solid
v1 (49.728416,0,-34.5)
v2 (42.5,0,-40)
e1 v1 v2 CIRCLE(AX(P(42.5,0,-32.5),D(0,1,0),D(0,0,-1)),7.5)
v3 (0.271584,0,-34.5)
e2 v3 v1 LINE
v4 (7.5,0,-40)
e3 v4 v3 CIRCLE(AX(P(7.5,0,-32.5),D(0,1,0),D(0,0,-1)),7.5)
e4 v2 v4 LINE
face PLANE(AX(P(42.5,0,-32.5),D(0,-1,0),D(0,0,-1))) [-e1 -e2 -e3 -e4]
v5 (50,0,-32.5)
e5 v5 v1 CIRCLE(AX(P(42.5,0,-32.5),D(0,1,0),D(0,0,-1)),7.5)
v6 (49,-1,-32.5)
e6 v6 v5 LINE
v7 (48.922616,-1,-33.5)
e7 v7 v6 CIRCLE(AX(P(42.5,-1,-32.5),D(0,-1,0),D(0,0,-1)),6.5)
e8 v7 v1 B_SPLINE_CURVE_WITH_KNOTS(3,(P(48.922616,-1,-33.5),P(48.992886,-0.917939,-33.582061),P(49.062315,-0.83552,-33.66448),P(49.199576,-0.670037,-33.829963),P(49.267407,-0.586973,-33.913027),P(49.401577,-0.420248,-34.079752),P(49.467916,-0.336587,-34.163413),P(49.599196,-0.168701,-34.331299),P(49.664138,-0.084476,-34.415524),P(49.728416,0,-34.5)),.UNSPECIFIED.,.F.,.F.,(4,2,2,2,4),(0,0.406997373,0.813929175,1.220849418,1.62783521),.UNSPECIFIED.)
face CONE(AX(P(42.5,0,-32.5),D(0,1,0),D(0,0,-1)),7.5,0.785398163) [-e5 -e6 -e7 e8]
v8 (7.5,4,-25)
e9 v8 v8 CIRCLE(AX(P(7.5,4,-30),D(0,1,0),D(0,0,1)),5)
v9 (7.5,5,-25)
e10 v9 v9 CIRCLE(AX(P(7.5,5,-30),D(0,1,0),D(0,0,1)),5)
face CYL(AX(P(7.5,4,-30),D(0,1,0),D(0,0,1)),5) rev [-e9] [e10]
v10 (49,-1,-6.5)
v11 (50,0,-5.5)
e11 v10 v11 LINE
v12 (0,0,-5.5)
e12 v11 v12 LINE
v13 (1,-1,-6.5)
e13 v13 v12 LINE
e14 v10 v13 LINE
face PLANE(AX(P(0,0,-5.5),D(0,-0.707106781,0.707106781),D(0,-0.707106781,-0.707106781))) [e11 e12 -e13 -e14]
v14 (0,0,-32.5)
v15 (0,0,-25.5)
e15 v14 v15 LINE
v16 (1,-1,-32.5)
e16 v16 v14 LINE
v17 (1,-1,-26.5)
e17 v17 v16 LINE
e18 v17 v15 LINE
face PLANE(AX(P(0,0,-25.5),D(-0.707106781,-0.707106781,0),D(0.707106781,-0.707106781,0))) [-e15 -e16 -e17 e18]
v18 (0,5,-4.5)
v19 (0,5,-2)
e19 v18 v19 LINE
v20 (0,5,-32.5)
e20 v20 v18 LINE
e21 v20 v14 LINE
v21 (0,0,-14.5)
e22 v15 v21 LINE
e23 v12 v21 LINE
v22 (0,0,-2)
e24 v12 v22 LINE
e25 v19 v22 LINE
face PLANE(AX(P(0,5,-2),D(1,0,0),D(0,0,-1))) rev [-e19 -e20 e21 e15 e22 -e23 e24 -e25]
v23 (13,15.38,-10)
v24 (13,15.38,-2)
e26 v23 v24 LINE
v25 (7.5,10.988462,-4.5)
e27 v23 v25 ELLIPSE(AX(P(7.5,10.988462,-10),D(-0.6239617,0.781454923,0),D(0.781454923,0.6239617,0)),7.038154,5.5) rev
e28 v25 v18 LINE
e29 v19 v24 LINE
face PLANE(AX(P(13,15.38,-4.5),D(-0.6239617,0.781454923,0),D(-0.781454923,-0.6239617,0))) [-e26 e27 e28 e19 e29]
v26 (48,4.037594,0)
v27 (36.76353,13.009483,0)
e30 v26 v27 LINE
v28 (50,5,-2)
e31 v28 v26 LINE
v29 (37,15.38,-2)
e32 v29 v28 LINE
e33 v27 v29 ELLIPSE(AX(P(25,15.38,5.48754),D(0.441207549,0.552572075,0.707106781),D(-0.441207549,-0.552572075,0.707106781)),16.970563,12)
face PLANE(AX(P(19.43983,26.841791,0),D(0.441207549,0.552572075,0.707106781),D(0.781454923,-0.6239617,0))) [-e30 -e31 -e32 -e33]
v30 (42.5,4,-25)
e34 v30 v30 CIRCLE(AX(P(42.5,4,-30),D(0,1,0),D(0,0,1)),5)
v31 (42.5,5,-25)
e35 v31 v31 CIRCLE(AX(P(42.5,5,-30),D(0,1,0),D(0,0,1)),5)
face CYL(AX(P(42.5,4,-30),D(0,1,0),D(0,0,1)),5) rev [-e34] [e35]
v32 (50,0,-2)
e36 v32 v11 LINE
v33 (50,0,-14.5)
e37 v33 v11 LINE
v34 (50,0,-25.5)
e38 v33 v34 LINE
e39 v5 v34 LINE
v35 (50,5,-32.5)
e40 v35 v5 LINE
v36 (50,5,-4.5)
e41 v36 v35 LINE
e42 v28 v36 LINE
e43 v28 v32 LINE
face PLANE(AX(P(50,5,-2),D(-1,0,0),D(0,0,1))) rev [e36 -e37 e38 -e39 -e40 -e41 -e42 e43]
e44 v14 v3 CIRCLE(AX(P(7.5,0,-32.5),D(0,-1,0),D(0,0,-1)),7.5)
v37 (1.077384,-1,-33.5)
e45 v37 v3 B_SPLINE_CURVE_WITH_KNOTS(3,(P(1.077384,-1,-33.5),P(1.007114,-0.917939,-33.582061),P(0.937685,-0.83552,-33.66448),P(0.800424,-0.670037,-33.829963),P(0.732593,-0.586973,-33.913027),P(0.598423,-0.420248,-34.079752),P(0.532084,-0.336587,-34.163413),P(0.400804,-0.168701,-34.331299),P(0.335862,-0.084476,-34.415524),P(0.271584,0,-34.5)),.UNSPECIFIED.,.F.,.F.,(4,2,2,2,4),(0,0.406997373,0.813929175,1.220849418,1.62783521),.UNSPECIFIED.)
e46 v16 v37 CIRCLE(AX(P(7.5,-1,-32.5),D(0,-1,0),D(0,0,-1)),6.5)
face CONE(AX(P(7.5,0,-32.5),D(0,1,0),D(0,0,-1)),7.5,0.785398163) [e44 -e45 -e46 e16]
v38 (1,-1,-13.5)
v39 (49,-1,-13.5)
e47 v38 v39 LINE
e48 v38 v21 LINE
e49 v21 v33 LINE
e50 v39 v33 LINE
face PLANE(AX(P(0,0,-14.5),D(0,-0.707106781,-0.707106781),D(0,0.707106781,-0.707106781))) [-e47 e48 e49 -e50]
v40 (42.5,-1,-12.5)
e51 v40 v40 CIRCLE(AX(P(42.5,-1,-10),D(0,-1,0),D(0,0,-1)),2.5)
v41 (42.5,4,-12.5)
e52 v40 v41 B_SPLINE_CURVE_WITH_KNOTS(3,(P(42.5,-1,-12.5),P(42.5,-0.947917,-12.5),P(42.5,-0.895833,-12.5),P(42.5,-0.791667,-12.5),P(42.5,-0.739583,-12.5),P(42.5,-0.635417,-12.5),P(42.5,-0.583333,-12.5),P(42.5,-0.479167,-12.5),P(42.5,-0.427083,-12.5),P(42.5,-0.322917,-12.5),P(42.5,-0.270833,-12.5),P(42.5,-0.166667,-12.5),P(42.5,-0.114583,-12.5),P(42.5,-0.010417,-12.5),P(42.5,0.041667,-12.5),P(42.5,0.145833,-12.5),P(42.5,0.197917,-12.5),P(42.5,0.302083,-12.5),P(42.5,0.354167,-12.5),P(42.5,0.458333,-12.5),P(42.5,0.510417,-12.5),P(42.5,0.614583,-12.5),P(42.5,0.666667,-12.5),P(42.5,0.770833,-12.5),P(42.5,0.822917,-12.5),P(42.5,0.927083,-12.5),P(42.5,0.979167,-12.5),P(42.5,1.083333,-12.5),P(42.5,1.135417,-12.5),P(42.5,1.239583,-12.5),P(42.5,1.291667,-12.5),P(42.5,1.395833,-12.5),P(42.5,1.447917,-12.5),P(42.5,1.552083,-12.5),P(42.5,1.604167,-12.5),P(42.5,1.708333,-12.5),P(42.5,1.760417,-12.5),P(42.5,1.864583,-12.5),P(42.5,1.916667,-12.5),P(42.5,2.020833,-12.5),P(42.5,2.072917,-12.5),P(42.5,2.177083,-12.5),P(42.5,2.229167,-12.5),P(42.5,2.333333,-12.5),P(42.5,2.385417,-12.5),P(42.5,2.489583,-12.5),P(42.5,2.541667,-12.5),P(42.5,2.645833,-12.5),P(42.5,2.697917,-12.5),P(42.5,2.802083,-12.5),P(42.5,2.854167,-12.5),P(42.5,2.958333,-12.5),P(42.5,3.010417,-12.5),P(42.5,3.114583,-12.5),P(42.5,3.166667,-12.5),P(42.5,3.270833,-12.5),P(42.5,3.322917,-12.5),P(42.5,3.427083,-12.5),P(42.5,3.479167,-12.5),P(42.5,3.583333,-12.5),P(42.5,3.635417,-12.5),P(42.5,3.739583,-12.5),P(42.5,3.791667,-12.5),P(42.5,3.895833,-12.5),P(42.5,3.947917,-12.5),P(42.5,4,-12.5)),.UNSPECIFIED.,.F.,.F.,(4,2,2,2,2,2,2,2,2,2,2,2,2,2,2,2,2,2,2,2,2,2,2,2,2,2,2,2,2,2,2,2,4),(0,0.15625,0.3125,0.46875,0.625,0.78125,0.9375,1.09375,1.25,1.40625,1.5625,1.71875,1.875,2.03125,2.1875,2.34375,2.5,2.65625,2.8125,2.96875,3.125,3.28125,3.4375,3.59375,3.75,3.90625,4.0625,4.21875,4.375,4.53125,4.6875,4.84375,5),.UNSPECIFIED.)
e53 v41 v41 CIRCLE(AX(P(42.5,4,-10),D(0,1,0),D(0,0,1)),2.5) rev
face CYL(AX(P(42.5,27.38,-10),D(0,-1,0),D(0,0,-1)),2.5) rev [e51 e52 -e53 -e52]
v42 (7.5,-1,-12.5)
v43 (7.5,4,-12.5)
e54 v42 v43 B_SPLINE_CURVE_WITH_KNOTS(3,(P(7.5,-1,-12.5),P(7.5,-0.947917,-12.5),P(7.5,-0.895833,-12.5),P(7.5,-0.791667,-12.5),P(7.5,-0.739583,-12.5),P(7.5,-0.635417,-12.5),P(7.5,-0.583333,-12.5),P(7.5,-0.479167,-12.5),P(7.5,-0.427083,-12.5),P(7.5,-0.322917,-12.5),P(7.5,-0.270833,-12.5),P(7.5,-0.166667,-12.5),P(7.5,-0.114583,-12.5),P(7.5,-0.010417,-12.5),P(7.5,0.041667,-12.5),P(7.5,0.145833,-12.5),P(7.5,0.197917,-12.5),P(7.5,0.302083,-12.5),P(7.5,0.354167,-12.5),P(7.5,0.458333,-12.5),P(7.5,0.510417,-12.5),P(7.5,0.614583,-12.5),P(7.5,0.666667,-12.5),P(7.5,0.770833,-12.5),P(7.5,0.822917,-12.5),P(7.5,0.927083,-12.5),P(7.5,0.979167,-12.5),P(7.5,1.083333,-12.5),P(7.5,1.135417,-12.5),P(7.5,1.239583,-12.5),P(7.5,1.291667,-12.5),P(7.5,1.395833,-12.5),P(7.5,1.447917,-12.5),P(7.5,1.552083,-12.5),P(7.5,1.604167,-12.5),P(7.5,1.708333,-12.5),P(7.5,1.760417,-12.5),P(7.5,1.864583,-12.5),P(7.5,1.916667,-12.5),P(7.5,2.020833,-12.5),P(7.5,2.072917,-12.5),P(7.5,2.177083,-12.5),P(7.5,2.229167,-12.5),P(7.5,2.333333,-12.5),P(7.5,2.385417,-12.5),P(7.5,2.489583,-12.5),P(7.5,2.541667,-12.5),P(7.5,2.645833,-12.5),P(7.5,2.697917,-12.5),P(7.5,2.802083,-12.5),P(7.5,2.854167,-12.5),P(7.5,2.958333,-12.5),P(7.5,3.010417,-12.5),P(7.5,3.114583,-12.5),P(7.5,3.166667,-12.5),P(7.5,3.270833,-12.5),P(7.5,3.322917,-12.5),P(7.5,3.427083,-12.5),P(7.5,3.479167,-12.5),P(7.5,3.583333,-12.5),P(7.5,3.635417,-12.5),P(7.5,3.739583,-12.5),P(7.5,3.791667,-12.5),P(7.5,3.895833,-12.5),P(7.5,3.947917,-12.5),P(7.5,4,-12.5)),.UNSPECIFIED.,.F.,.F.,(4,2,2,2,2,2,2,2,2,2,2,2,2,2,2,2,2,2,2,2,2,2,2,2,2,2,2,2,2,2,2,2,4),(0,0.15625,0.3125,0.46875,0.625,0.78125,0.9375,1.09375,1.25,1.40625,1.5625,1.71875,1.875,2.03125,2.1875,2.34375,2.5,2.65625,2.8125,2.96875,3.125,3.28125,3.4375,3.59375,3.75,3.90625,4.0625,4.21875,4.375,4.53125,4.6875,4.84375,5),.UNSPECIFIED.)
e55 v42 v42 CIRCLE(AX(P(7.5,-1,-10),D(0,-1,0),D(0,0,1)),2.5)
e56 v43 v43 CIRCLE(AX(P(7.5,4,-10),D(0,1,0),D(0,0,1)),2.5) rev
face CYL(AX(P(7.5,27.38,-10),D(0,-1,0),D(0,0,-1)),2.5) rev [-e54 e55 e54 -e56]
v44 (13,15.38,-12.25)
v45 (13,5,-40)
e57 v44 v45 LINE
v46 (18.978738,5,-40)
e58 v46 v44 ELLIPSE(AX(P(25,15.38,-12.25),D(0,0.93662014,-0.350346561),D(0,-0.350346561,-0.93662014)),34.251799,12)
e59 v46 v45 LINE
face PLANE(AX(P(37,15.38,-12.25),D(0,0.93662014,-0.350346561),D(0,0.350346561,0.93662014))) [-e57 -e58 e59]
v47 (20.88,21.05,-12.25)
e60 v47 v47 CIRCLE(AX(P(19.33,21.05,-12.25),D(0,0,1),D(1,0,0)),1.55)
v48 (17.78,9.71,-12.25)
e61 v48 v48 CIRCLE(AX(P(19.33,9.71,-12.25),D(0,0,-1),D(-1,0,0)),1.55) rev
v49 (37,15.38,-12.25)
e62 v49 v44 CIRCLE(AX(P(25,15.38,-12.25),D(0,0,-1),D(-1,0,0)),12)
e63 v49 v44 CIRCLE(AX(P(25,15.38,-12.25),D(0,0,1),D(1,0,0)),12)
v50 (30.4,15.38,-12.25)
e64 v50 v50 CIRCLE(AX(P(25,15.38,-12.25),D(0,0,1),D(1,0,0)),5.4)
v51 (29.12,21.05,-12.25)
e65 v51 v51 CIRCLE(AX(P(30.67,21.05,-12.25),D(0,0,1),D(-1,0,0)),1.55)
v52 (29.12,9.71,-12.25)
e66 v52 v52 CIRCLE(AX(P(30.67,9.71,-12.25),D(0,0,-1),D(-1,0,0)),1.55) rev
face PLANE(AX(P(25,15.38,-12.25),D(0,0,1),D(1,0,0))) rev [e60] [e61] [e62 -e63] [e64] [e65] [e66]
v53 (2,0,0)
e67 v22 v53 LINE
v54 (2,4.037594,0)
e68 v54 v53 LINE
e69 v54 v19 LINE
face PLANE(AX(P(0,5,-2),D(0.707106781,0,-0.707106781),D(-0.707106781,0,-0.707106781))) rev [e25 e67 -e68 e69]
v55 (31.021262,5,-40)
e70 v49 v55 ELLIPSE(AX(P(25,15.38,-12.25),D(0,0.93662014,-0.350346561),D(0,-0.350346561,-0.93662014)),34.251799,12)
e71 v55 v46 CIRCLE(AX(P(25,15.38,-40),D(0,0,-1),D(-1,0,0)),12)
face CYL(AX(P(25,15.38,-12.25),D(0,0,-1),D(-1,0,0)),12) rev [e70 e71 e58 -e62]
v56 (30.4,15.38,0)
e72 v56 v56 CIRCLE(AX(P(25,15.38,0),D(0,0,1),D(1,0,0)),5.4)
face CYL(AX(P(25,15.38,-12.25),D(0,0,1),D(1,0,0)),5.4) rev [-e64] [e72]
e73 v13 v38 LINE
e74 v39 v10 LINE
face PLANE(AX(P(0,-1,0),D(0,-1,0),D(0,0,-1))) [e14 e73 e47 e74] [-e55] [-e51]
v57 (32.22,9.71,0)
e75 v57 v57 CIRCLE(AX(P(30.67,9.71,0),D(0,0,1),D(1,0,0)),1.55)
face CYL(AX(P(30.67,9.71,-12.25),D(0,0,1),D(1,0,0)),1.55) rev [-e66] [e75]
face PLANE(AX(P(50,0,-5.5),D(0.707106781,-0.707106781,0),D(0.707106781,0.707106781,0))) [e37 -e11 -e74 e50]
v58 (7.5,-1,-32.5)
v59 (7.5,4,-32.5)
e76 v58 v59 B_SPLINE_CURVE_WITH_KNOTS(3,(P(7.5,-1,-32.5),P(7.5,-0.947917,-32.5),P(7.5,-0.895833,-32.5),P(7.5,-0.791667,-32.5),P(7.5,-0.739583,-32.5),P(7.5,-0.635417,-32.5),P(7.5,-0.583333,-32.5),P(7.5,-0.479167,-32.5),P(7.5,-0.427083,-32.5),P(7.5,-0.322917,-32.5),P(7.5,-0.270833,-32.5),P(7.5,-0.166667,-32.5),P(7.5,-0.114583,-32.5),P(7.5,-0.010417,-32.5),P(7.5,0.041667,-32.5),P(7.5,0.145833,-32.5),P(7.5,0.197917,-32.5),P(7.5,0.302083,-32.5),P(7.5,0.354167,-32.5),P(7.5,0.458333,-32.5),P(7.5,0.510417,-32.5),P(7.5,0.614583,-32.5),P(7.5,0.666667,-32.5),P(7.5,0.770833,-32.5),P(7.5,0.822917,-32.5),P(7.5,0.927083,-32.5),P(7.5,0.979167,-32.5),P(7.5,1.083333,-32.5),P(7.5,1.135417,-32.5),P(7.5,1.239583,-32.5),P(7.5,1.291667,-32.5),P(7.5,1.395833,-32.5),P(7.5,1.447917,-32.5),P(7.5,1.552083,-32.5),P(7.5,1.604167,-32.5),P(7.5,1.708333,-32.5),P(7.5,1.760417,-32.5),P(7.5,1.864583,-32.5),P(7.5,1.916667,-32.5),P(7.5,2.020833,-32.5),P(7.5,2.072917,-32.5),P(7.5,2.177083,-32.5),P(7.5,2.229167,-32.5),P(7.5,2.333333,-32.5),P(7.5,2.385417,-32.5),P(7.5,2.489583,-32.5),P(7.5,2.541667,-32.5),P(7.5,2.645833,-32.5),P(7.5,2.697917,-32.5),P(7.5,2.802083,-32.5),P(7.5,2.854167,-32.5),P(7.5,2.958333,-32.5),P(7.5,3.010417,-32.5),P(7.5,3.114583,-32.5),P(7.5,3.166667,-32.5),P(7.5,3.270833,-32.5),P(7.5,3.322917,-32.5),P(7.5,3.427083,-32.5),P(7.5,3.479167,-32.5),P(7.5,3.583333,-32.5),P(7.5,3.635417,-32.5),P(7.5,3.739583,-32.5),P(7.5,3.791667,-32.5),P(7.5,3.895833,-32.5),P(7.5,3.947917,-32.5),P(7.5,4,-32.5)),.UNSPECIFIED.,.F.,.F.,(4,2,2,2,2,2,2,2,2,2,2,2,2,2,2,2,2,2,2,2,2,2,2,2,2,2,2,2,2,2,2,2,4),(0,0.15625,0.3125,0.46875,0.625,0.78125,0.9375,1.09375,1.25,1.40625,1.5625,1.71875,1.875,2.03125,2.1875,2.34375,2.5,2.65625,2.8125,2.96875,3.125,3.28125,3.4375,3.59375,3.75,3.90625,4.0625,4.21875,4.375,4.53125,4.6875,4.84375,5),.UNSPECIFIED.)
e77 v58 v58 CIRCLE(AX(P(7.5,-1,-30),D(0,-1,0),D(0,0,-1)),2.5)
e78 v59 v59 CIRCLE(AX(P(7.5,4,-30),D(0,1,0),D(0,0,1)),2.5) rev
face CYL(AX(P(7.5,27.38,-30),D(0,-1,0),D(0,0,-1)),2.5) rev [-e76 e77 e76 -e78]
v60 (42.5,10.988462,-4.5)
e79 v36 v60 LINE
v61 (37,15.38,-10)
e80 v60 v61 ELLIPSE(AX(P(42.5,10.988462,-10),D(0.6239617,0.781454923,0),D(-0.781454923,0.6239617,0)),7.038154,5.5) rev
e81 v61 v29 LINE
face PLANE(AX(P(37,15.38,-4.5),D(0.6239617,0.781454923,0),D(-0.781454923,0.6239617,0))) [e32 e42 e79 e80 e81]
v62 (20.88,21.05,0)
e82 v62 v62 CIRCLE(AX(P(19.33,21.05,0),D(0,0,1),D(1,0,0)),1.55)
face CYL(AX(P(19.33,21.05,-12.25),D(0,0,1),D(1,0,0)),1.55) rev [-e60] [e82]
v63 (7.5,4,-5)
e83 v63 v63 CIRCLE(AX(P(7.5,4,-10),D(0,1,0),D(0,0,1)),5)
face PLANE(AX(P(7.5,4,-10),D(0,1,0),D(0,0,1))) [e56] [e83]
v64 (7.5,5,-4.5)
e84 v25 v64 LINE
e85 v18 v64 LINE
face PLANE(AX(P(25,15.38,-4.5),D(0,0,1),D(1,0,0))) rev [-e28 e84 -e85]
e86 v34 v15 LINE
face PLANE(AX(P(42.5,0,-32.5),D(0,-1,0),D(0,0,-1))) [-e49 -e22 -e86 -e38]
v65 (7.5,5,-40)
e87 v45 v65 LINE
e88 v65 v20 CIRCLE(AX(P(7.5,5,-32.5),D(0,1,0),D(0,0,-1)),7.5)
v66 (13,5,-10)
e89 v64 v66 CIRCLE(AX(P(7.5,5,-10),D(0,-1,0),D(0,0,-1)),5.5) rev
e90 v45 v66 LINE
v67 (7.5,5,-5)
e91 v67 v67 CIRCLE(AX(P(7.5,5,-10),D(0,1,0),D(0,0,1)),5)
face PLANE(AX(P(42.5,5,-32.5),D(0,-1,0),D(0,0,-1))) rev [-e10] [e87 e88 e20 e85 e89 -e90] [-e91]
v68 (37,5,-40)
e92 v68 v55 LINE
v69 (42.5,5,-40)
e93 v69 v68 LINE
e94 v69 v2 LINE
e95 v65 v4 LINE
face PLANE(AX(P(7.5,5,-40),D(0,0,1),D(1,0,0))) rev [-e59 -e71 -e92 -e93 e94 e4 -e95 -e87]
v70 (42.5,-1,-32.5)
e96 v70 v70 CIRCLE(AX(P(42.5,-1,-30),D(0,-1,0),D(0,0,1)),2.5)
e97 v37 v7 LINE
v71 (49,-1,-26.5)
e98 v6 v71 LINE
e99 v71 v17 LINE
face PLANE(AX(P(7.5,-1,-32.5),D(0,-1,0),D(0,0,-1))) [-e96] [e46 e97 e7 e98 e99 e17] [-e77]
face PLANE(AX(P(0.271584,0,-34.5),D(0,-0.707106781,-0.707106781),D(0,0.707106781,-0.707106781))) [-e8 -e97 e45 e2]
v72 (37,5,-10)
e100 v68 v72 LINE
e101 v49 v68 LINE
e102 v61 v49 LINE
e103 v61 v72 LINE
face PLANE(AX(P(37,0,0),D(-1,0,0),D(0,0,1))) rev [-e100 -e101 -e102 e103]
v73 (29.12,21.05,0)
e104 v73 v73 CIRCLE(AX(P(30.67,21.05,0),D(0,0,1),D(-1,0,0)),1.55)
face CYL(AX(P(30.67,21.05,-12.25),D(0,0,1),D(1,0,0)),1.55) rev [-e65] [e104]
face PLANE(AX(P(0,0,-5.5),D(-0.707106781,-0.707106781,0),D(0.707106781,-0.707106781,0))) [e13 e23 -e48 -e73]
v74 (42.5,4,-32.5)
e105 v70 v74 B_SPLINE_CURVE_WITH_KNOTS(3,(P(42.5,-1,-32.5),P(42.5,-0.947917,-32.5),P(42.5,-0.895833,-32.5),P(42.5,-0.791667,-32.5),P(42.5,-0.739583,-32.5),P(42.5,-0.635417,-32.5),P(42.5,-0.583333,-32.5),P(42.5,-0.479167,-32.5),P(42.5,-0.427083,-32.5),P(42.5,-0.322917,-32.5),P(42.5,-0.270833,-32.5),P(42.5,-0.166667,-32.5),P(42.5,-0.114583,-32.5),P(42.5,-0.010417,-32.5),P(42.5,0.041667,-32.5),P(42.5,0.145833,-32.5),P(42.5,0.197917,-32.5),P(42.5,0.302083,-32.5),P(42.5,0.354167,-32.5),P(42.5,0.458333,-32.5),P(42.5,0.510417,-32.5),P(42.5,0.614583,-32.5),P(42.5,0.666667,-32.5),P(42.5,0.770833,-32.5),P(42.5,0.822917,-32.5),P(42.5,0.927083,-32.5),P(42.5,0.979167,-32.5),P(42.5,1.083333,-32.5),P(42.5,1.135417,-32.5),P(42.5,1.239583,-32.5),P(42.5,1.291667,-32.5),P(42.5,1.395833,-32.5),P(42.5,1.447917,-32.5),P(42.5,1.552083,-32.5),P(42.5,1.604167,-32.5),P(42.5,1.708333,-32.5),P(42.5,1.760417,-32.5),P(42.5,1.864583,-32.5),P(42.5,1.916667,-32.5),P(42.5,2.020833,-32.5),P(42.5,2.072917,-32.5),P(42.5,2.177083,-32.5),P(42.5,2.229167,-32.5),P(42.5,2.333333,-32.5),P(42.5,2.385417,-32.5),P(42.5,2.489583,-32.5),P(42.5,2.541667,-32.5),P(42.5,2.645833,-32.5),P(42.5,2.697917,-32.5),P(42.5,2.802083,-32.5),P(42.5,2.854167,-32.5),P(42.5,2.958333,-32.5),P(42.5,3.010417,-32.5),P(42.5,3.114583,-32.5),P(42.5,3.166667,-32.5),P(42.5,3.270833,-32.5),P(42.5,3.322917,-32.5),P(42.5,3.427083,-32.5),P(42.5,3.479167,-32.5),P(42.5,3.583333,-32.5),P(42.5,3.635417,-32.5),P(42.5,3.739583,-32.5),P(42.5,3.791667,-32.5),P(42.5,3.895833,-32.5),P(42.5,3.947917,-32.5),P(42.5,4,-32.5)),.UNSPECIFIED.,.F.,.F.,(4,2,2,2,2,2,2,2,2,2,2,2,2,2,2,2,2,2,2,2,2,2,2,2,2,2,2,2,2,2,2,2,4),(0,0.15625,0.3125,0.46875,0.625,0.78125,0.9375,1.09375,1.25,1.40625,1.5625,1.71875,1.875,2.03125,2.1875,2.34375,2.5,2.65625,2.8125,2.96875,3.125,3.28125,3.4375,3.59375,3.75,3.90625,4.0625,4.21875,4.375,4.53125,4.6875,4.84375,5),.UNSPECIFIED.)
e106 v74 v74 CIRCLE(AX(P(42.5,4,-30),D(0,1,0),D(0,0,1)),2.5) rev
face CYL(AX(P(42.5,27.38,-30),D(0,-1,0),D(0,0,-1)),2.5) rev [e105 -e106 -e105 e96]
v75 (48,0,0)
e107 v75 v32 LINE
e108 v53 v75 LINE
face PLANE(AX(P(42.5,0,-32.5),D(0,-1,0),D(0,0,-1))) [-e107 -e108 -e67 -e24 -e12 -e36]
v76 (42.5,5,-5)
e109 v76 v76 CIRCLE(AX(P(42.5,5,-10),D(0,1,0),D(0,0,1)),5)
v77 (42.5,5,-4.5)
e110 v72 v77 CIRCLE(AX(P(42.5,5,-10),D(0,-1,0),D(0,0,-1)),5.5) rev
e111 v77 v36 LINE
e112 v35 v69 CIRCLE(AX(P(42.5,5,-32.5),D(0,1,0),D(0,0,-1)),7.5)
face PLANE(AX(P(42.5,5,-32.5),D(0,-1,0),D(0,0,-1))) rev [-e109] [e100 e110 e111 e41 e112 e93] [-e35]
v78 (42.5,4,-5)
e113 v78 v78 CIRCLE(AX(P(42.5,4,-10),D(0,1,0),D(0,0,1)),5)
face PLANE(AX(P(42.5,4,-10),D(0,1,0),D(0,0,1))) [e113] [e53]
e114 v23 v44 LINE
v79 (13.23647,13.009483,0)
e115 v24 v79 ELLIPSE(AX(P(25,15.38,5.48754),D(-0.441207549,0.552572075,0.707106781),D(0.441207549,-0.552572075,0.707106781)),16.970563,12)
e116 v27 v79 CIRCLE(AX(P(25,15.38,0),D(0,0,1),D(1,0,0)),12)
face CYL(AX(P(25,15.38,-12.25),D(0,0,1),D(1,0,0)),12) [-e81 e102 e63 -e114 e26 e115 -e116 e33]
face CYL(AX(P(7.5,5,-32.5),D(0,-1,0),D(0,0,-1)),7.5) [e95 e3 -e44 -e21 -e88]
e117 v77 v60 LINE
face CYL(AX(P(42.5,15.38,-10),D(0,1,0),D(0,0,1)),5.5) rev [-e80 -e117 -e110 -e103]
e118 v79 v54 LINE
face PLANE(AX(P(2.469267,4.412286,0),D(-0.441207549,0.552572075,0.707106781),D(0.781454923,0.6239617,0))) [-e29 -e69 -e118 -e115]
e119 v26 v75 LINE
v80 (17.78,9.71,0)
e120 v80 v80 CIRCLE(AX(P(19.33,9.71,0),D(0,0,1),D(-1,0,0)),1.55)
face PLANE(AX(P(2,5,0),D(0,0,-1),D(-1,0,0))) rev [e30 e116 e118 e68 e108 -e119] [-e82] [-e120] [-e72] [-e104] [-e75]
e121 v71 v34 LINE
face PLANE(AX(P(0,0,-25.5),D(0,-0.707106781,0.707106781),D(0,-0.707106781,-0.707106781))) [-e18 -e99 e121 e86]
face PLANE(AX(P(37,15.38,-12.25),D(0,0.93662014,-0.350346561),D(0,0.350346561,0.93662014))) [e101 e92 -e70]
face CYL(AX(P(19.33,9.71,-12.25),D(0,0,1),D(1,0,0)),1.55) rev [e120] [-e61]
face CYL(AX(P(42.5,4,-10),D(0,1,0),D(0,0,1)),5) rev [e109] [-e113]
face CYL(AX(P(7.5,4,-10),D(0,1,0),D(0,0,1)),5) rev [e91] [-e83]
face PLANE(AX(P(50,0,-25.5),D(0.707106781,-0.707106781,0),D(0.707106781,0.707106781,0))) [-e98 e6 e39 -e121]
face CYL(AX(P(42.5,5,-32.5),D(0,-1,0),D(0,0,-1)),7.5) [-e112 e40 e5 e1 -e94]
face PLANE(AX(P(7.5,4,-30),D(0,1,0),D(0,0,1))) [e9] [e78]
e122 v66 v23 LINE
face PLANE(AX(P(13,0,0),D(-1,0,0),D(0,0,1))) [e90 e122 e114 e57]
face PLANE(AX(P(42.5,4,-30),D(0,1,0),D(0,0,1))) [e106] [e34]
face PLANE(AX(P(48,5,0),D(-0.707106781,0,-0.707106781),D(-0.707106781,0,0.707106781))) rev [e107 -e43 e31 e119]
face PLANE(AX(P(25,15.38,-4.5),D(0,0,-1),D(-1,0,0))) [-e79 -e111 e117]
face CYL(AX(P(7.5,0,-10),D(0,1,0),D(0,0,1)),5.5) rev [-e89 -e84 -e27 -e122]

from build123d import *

# Parameters (mm, degrees)
BOSS_EXTRUDE1_DEPTH           = 5
SKETCH2_R                     = 12
SKETCH2_R_2                   = 5.4
SKETCH2_R_3                   = 1.55
BOSS_EXTRUDE2_DEPTH           = 12.25
BOSS_EXTRUDE3_DEPTH           = 4.5
CHAMFER1_SIZE                 = 2
BOSS_EXTRUDE4_DEPTH           = 24
SKETCH5_R                     = 5.4
SKETCH5_R_2                   = 1.55
CUT_EXTRUDE1_DEPTH            = 70.639531877
CUT_EXTRUDE2_START            = -27.75
SKETCH6_R                     = 12
CUT_EXTRUDE2_DEPTH            = 27.75
FILLET1_R                     = 5.5
BOSS_EXTRUDE5_DEPTH           = 1
BOSS_EXTRUDE5_DRAFT           = 45
SKETCH7_W                     = 50
SKETCH7_H                     = 9
BOSS_EXTRUDE5_PROFILE_2_DEPTH = 1
BOSS_EXTRUDE5_PROFILE_2_DRAFT = 45
SKETCH8_R                     = 2.5
CUT_EXTRUDE3_DEPTH            = 71.038734997
SKETCH9_R                     = 5
CUT_EXTRUDE4_DEPTH            = 1


with BuildPart() as part:
    # Sketch1 → Boss-Extrude1 (new body)
    with BuildSketch(Plane(origin=(0, 0, 0), x_dir=(1, 0, 0), z_dir=(0, 1, 0))):
        with BuildLine():
            Line((0, 2), (2, 0))
            Line((2, 0), (48, 0))
            Line((48, 0), (50, 2))
            Line((50, 2), (50, 32.5))
            ThreePointArc((50, 32.5), (47.803300859, 37.803300859), (42.5, 40))
            Line((42.5, 40), (7.5, 40))
            ThreePointArc((7.5, 40), (2.196699141, 37.803300859), (0, 32.5))
            Line((0, 32.5), (0, 2))
        make_face()
    extrude(amount=BOSS_EXTRUDE1_DEPTH)

    # Sketch2 → Boss-Extrude2 (add)
    with BuildSketch(Plane.XY):
        with Locations((25, 15.38)):
            Circle(SKETCH2_R)
        with Locations((25, 15.38)):
            Circle(SKETCH2_R_2, mode=Mode.SUBTRACT)
        with Locations((19.33, 21.05)):
            Circle(SKETCH2_R_3, mode=Mode.SUBTRACT)
        with Locations(Location((30.67, 21.05, 0), (0, 0, 180))):
            Circle(SKETCH2_R_3, mode=Mode.SUBTRACT)
        with Locations((30.67, 9.71)):
            Circle(SKETCH2_R_3, mode=Mode.SUBTRACT)
        with Locations(Location((19.33, 9.71, 0), (0, 0, 180))):
            Circle(SKETCH2_R_3, mode=Mode.SUBTRACT)
    extrude(amount=-BOSS_EXTRUDE2_DEPTH)

    # Sketch3 → Boss-Extrude3 (add)
    with BuildSketch(Plane.XY):
        with BuildLine():
            Line((13, 15.38), (0, 5))
            Line((0, 5), (18.978737674, 5))
            ThreePointArc((18.978737674, 5), (14.601559061, 9.390640598), (13, 15.38))
        make_face()
        with BuildLine():
            Line((50, 5), (31.021262326, 5))
            ThreePointArc((31.021262326, 5), (35.398440939, 9.390640598), (37, 15.38))
            Line((37, 15.38), (50, 5))
        make_face()
    extrude(amount=-BOSS_EXTRUDE3_DEPTH)

    # Chamfer1
    # the kernel refuses this chamfer: 2 mm, written as the material it takes off along each edge
    with BuildSketch(Plane(origin=(32.980691337, 18.589263379, 0), x_dir=(-0.6237257907466237, -0.7811594681797787, 0.027495876610586348), z_dir=(0.7814549230707756, -0.6239617001134351, 0))) as chamfer1_piece_1_section:
        Polygon((CHAMFER1_SIZE * 0.999621916911, CHAMFER1_SIZE * 0.0274958766106), (-CHAMFER1_SIZE * 0.0274958766106, CHAMFER1_SIZE * 0.999621916911), (0, 0), align=None)
    chamfer1_piece_1 = extrude(amount=26.922368399, mode=Mode.PRIVATE)
    chamfer1_piece_1 = chamfer1_piece_1 - Plane(origin=(25, 15.38, -0.663889937), x_dir=(1, 0, 0), z_dir=(0, 0, 1)) * Cylinder(12, 62, mode=Mode.PRIVATE)
    add(chamfer1_piece_1, mode=Mode.SUBTRACT)
    with BuildSketch(Plane(origin=(17.019308663, 18.589263379, 0), x_dir=(-0.017156373916051248, 0.02148678814149, -0.9996219169112968), z_dir=(-0.7814549230707758, -0.6239617001134349, 0))) as chamfer1_piece_2_section:
        Polygon((CHAMFER1_SIZE * 0.999621916911, CHAMFER1_SIZE * 0.0274958766106), (-CHAMFER1_SIZE * 0.0274958766106, CHAMFER1_SIZE * 0.999621916911), (0, 0), align=None)
    chamfer1_piece_2 = extrude(amount=26.922368399, mode=Mode.PRIVATE)
    chamfer1_piece_2 = chamfer1_piece_2 - Plane(origin=(25, 15.38, -0.663889938), x_dir=(1, 0, 0), z_dir=(0, 0, 1)) * Cylinder(12, 62, mode=Mode.PRIVATE)
    add(chamfer1_piece_2, mode=Mode.SUBTRACT)

    # Sketch4 → Boss-Extrude4 (add)
    with BuildSketch(Plane.ZY.offset(-13)):
        Polygon((-40, 5), (-4.5, 5), (-4.5, 15.38), (-12.25, 15.38), align=None)
    extrude(amount=-BOSS_EXTRUDE4_DEPTH)

    # Sketch5 → Cut-Extrude1 (cut, through all)
    with BuildSketch(Plane.XY):
        with Locations((25, 15.38)):
            Circle(SKETCH5_R)
        with Locations((30.67, 9.71)):
            Circle(SKETCH5_R_2)
        with Locations(Location((19.33, 9.71, 0), (0, 0, 90))):
            Circle(SKETCH5_R_2)
    extrude(amount=-CUT_EXTRUDE1_DEPTH, mode=Mode.SUBTRACT)

    # Sketch6 → Cut-Extrude2 (cut)
    with BuildSketch(Plane(origin=(0, 0, -40), x_dir=(-1, 0, 0), z_dir=(0, 0, -1)).offset(CUT_EXTRUDE2_START)):
        with Locations((-25, 15.38)):
            Circle(SKETCH6_R)
    extrude(amount=CUT_EXTRUDE2_DEPTH, mode=Mode.SUBTRACT)

    # Fillet1
    # the kernel refuses this fillet: 5.5 mm, written as the material it adds along each edge
    with BuildSketch(Plane(origin=(13, 5, -4.5), x_dir=(0, 0, -1), z_dir=(0, 1, 0))) as fillet1_piece_1_section:
        with BuildLine():
            CenterArc((FILLET1_R, FILLET1_R), FILLET1_R, 180, 90)
            Line((0, FILLET1_R), (0, 0))
            Line((0, 0), (FILLET1_R, 0))
        make_face()
    fillet1_piece_1 = extrude(amount=24.13, mode=Mode.PRIVATE)
    fillet1_piece_1 = split(fillet1_piece_1, bisect_by=Plane(origin=(9.562905038, 12.635611869, -5.815830527), z_dir=(0.6239617001134349, -0.7814549230707758, 0)), keep=Keep.TOP, mode=Mode.PRIVATE)
    add(fillet1_piece_1)
    with BuildSketch(Plane(origin=(37, 5, -4.5), x_dir=(1, 0, 0), z_dir=(0, 1, 0))) as fillet1_piece_2_section:
        with BuildLine():
            CenterArc((FILLET1_R, FILLET1_R), FILLET1_R, 180, 90)
            Line((0, FILLET1_R), (0, 0))
            Line((0, 0), (FILLET1_R, 0))
        make_face()
    fillet1_piece_2 = extrude(amount=24.13, mode=Mode.PRIVATE)
    fillet1_piece_2 = split(fillet1_piece_2, bisect_by=Plane(origin=(40.437094962, 12.635611869, -5.815830527), z_dir=(-0.6239617001134351, -0.7814549230707756, 0)), keep=Keep.TOP, mode=Mode.PRIVATE)
    add(fillet1_piece_2)


with BuildPart() as boss_extrude5_tool:
    # Sketch7 → Boss-Extrude5 (with draft: the straight prism first)
    with BuildSketch(Plane.XZ):
        with BuildLine():
            Line((0, -25.5), (0, -32.5))
            ThreePointArc((0, -32.5), (0.068206101, -33.509177609), (0.271583853, -34.5))
            Line((0.271583853, -34.5), (49.728416147, -34.5))
            ThreePointArc((49.728416147, -34.5), (49.931793899, -33.509177609), (50, -32.5))
            Line((50, -32.5), (50, -25.5))
            Line((50, -25.5), (0, -25.5))
        make_face()
    extrude(amount=BOSS_EXTRUDE5_DEPTH)
    # Boss-Extrude5: the draft: its side faces are tilted about the plane it starts from
    boss_extrude5_sides = [boss_extrude5_tool.faces().sort_by_distance(p)[0] for p in [
        (0, -0.5, -29),
        (0.068206101, -0.5, -33.509177609),
        (25, -0.5, -34.5),
        (49.931793899, -0.5, -33.509177609),
        (50, -0.5, -29),
        (25, -0.5, -25.5),
    ]]
    draft(boss_extrude5_sides, Plane.XZ, BOSS_EXTRUDE5_DRAFT)


with BuildPart() as part_1:
    add(part.part)

    # Boss-Extrude5: add boss_extrude5_tool
    add(boss_extrude5_tool.part)


with BuildPart() as boss_extrude5_profile_2_tool:
    # Sketch7 → Boss-Extrude5 profile 2 (with draft: the straight prism first)
    with BuildSketch(Plane.XZ):
        with Locations((25, -10)):
            Rectangle(SKETCH7_W, SKETCH7_H)
    extrude(amount=BOSS_EXTRUDE5_PROFILE_2_DEPTH)
    # Boss-Extrude5 profile 2: the draft: its side faces are tilted about the plane it starts from
    boss_extrude5_profile_2_sides = [boss_extrude5_profile_2_tool.faces().sort_by_distance(p)[0] for p in [
        (0, -0.5, -10),
        (25, -0.5, -14.5),
        (50, -0.5, -10),
        (25, -0.5, -5.5),
    ]]
    draft(boss_extrude5_profile_2_sides, Plane.XZ, BOSS_EXTRUDE5_PROFILE_2_DRAFT)


with BuildPart() as part_2:
    add(part_1.part)

    # Boss-Extrude5 profile 2: add boss_extrude5_profile_2_tool
    add(boss_extrude5_profile_2_tool.part)

    # Sketch8 → Cut-Extrude3 (cut, through all)
    with BuildSketch(Plane.XZ.offset(1)):
        with Locations(Location((7.5, -30, 0), (0, 0, 270))):
            Circle(SKETCH8_R)
        with Locations(Location((42.5, -30, 0), (0, 0, 270))):
            Circle(SKETCH8_R)
        with Locations(Location((42.5, -10, 0), (0, 0, 270))):
            Circle(SKETCH8_R)
        with Locations(Location((7.5, -10, 0), (0, 0, 270))):
            Circle(SKETCH8_R)
    extrude(amount=-CUT_EXTRUDE3_DEPTH, mode=Mode.SUBTRACT)

    # Sketch9 → Cut-Extrude4 (cut)
    with BuildSketch(Plane(origin=(0, 5, 0), x_dir=(1, 0, 0), z_dir=(0, 1, 0))):
        with Locations(Location((7.5, 30, 0), (0, 0, 270))):
            Circle(SKETCH9_R)
        with Locations(Location((7.5, 10, 0), (0, 0, 270))):
            Circle(SKETCH9_R)
        with Locations(Location((42.5, 30, 0), (0, 0, 270))):
            Circle(SKETCH9_R)
        with Locations(Location((42.5, 10, 0), (0, 0, 270))):
            Circle(SKETCH9_R)
    extrude(amount=-CUT_EXTRUDE4_DEPTH, mode=Mode.SUBTRACT)


solid = part_2.part
